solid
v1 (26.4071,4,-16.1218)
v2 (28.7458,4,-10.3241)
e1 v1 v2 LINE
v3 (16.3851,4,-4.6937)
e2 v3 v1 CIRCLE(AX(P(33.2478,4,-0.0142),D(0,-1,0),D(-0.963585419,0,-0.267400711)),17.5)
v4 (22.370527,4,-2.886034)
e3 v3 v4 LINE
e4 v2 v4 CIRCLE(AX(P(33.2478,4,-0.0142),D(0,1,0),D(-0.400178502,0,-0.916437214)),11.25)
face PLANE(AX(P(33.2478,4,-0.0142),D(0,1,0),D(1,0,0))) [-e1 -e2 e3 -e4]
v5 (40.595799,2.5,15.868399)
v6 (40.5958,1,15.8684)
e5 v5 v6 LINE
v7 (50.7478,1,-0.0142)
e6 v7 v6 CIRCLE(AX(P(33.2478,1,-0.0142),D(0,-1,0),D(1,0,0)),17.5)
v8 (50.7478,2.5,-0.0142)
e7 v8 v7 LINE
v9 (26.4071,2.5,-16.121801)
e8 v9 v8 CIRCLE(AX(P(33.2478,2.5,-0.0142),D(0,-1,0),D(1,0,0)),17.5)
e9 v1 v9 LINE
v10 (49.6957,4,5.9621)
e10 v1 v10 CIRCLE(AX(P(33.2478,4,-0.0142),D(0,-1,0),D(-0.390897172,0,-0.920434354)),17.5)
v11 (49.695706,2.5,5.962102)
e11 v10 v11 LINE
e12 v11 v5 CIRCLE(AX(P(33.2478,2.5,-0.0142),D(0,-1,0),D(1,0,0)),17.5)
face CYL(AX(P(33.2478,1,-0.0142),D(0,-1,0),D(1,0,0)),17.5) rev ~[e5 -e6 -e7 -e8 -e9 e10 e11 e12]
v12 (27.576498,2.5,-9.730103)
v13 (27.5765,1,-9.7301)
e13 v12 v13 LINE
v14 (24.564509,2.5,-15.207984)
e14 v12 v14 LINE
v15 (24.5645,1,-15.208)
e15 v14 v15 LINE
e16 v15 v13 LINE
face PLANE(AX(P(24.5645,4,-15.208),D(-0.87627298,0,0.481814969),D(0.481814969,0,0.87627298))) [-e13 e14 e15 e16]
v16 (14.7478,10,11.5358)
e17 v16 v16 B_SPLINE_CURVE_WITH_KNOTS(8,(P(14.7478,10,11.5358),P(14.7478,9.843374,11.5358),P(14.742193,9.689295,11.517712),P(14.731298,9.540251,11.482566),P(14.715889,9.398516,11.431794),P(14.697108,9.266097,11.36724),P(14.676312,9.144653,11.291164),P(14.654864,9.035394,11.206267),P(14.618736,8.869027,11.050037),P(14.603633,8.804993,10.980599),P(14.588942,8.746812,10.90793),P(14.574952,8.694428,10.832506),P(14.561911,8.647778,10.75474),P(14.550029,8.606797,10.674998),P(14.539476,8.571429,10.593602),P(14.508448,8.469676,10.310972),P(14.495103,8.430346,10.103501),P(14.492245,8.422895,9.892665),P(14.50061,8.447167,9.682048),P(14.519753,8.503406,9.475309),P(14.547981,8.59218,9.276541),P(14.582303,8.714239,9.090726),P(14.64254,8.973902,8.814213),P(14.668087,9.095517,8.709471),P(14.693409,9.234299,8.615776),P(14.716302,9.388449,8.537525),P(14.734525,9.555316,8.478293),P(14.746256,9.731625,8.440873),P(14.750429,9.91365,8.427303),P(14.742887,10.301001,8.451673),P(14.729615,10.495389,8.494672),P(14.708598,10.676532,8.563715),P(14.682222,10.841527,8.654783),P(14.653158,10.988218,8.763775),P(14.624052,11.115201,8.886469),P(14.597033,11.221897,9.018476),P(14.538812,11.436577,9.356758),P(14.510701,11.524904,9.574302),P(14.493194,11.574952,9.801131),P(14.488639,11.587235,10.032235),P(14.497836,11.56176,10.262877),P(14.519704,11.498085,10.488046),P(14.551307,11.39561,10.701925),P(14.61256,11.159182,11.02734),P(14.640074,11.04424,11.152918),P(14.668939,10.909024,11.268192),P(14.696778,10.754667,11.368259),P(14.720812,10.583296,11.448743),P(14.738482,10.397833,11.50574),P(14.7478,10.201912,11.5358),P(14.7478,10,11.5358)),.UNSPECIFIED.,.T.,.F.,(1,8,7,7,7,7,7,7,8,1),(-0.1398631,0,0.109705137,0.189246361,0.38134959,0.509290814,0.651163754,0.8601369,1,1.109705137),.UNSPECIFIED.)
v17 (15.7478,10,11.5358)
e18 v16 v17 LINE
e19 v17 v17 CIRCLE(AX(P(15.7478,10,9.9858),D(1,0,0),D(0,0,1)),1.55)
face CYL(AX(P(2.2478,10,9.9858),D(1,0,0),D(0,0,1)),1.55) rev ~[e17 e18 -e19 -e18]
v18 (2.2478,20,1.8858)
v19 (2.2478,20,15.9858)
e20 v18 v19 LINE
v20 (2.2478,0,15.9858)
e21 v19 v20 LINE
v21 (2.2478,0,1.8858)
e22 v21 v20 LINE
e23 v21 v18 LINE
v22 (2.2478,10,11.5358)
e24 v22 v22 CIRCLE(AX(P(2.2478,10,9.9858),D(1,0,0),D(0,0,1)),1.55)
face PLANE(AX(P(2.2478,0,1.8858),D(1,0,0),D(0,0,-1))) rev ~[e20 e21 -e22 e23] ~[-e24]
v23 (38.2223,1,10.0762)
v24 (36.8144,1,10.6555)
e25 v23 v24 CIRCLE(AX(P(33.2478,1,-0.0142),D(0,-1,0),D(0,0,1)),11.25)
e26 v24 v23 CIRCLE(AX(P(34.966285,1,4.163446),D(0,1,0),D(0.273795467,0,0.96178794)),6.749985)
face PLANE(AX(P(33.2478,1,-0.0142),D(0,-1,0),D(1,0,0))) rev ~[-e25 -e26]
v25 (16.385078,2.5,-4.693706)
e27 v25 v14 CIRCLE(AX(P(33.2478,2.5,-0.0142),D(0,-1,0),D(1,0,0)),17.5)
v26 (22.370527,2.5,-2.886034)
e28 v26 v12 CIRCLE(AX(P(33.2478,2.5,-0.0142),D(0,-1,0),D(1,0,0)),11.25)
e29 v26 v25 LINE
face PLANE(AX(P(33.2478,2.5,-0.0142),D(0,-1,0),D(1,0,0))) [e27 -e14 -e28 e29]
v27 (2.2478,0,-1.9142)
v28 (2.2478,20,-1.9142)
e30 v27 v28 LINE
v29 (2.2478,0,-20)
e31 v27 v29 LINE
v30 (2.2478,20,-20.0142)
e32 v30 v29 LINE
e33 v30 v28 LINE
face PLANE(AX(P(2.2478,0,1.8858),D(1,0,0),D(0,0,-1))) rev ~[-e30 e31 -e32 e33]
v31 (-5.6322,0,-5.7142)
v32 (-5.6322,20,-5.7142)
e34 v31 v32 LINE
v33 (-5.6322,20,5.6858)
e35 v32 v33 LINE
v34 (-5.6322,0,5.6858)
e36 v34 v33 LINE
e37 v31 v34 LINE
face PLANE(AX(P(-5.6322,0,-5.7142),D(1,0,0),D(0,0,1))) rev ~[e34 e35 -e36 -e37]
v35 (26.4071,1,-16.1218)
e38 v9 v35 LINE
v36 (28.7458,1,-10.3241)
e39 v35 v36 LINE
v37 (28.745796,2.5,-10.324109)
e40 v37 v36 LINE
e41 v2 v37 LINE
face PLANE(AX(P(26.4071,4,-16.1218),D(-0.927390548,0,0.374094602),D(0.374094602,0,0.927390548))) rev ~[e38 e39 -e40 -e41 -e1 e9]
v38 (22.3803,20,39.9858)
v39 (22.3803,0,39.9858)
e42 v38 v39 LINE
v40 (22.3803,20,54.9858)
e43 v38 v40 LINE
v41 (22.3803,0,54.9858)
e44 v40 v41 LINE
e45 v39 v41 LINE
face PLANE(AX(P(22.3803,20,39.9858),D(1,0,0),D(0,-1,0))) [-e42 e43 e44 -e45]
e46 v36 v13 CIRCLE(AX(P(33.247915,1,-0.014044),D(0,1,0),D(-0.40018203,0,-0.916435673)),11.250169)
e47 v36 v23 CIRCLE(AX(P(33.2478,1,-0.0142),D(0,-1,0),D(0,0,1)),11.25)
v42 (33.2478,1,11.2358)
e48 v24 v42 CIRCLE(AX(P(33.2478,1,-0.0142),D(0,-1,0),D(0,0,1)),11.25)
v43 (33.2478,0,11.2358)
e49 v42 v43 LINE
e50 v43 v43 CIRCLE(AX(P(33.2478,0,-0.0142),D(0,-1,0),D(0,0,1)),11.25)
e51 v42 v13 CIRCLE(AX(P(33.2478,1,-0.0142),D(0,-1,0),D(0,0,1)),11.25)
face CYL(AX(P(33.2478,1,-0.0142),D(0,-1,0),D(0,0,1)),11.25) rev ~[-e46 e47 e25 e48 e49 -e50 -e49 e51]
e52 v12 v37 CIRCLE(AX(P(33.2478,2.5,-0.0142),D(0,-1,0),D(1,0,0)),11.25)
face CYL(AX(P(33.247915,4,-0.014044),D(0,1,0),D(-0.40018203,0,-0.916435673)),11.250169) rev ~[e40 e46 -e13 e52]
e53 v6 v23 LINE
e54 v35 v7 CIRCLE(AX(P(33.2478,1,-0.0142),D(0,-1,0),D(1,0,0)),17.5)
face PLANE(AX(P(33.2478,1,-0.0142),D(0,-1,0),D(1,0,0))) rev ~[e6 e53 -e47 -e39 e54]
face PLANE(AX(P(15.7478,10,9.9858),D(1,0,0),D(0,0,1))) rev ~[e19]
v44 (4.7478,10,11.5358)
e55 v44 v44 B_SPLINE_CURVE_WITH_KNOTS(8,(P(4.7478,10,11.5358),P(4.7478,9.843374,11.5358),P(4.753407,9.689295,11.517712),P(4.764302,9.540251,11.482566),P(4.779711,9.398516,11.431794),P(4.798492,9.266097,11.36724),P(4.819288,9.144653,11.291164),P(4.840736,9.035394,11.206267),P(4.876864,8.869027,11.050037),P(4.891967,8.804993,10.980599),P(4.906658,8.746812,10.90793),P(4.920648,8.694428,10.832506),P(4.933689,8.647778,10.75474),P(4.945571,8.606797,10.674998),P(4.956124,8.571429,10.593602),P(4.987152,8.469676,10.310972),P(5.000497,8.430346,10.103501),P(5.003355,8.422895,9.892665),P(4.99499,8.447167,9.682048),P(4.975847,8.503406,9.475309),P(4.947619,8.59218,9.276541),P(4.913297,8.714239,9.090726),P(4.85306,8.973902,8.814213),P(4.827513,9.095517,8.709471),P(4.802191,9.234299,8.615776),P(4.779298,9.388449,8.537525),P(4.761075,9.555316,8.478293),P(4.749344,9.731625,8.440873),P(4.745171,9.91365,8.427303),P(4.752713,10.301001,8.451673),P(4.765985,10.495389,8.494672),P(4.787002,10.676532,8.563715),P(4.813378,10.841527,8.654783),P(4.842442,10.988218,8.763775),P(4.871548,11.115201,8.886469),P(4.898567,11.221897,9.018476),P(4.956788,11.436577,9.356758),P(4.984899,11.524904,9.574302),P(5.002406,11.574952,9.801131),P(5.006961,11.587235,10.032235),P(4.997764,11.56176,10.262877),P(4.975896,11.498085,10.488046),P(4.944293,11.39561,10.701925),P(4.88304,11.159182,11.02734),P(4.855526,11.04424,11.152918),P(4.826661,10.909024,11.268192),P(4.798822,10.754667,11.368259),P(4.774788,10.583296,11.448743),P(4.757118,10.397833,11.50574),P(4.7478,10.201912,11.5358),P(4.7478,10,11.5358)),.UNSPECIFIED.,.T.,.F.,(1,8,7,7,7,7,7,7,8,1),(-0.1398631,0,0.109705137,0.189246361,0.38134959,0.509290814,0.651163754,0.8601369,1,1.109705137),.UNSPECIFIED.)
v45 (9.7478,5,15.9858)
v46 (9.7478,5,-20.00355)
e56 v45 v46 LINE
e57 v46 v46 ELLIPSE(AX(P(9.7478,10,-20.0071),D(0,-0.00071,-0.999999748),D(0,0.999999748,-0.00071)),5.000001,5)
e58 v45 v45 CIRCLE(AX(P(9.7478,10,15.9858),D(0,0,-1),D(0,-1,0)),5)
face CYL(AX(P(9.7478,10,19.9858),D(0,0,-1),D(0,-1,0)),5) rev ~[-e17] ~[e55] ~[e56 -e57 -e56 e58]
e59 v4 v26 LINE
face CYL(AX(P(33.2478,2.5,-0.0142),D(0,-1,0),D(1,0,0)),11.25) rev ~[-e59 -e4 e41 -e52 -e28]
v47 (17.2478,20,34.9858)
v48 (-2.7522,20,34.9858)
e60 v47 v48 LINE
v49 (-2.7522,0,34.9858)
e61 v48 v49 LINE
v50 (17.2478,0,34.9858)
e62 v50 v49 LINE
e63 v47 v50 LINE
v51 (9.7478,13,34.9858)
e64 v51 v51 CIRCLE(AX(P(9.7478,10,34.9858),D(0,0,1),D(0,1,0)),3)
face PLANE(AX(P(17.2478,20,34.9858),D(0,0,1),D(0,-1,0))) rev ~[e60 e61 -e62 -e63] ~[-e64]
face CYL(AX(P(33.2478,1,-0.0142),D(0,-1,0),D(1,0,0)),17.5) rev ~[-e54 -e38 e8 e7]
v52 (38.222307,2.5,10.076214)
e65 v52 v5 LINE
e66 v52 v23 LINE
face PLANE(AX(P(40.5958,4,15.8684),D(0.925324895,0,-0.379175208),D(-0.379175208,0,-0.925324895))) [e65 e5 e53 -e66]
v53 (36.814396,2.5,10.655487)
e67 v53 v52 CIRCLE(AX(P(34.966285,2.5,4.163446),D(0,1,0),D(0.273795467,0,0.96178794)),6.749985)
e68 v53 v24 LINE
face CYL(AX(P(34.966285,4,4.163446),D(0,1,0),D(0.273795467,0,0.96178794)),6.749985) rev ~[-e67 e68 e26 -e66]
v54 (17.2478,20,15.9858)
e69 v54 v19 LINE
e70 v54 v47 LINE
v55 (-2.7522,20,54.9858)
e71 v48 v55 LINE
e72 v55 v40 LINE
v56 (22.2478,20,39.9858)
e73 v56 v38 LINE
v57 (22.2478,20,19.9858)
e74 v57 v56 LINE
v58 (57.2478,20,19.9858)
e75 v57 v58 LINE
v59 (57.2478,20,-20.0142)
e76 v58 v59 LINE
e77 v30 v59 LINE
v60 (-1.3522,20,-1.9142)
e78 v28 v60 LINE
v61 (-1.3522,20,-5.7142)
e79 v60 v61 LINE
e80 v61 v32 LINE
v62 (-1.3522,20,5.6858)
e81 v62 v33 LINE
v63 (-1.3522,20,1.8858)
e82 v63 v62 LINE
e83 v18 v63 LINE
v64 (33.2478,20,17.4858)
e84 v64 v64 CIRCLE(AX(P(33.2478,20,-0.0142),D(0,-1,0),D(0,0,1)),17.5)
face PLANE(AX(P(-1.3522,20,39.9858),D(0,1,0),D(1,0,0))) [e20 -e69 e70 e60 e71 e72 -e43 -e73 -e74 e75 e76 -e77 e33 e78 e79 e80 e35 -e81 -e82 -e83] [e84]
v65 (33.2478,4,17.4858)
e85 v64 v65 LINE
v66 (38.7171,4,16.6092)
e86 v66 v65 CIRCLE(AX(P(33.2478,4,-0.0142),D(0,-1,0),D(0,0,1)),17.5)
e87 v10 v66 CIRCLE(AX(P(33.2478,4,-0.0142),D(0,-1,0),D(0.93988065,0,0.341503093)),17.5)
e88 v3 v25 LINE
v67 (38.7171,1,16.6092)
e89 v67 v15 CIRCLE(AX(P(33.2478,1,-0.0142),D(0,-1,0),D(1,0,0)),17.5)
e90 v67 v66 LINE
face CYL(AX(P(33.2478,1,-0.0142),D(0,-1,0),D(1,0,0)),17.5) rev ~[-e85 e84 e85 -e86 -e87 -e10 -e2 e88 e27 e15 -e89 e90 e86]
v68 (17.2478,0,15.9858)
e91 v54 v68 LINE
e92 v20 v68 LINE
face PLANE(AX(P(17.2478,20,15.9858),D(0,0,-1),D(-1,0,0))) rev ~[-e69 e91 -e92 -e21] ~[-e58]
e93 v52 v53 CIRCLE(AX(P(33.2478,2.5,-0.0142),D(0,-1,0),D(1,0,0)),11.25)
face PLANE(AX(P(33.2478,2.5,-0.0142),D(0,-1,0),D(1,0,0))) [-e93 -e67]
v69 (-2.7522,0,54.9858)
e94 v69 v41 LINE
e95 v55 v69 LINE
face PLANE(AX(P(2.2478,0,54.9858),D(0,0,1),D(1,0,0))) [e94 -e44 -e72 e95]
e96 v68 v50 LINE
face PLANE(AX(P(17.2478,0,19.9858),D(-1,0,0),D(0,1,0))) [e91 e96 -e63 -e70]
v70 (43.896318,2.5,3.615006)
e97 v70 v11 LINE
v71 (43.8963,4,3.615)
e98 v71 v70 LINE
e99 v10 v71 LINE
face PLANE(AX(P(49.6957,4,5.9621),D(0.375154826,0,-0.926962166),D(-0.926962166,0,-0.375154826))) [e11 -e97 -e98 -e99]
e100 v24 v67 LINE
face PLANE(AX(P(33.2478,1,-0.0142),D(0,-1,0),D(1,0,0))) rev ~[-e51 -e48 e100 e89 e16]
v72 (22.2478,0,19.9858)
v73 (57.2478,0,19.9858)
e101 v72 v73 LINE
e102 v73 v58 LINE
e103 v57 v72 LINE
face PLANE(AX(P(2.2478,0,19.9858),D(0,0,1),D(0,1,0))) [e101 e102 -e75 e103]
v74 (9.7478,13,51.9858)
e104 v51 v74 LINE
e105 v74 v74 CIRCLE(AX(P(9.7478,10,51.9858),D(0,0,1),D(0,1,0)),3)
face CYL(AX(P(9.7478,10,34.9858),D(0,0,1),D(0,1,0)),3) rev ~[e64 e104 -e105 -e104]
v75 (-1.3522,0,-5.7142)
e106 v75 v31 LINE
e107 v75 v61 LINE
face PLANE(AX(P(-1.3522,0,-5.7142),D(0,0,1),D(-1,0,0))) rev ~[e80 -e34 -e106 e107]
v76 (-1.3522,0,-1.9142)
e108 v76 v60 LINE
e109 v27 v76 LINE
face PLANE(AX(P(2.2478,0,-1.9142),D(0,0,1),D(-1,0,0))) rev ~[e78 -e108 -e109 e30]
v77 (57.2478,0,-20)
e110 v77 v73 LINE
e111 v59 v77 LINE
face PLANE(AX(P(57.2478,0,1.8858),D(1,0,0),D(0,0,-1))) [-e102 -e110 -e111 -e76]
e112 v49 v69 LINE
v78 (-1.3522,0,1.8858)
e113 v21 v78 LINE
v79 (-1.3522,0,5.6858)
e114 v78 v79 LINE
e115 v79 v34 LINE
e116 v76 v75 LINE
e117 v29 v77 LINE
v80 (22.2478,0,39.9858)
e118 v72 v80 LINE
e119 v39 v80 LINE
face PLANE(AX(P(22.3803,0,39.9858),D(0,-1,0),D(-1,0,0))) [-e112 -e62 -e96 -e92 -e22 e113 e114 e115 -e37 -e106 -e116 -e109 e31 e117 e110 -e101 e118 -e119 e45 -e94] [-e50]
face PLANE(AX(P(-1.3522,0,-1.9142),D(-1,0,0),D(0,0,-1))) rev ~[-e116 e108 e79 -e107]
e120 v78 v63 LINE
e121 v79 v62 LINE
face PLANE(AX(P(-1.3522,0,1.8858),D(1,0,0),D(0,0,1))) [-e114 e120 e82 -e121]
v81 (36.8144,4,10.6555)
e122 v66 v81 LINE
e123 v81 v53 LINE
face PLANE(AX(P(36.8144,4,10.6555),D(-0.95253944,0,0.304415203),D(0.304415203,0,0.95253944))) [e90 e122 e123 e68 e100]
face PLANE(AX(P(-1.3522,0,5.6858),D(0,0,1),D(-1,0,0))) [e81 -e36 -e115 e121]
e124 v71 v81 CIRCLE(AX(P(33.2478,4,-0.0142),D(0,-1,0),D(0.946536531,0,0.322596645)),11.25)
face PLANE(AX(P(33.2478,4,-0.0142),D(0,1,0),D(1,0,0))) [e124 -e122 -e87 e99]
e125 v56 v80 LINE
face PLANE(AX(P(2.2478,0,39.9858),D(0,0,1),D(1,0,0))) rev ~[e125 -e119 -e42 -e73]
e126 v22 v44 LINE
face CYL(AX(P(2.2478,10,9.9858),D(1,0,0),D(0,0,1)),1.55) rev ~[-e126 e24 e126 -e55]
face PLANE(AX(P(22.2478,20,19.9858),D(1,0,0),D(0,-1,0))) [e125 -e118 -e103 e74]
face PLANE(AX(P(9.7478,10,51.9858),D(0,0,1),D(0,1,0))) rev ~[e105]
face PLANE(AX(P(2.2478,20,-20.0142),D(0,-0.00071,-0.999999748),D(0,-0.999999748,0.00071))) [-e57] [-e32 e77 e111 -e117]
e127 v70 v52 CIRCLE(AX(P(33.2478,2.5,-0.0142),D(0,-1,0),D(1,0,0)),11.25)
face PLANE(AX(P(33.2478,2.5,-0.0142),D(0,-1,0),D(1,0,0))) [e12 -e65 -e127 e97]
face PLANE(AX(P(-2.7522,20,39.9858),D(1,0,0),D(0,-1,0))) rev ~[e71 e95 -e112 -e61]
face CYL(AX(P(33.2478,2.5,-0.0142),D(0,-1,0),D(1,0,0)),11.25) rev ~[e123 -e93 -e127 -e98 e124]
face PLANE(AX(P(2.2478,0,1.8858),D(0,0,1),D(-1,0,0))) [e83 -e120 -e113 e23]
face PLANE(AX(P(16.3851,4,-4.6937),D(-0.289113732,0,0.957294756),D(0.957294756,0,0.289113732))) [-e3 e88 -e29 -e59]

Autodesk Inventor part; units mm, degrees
ref_plane "YZ Plane" through (0, 0, 0) normal (1, 0, 0) x (0, 1, 0)
ref_plane "XZ Plane" through (0, 0, 0) normal (0, 1, 0) x (-1, 0, 0)
ref_plane "XY Plane" through (0, 0, 0) normal (0, 0, 1) x (1, 0, 0)
sketch "Sketch1" plane through (0, 0, 0) normal (0, 1, 0) x (-1, 0, 0)
  line L0 (-2.2478, 1.8858) -> (1.3522, 1.8858)
  line L1 (-2.2478, 1.8858) -> (-2.2478, -1.9142)
  line L2 (-2.2478, -1.9142) -> (1.3522, -1.9142)
  line L3 (1.3522, 1.8858) -> (1.3522, 5.6858)
  line L4 (1.3522, -1.9142) -> (1.3522, -5.7142)
  line L5 (1.3522, -5.7142) -> (5.6322, -5.7142)
  line L6 (5.6322, -5.7142) -> (5.6322, 5.6858)
  line L7 (1.3522, 5.6858) -> (5.6322, 5.6858)
  point P0 (0, 0)
  dimension "d1" = 3.6
  dimension "d2" = 3.8
  dimension "d3" = 3.8
  dimension "d4" = 3.8
  dimension "d6" = 4.28
  dimension "d7" = 11.4
  dimension "d98" = 3.6
extrude "Extrusion1" add sketch "Sketch1" along normal blind 20
sketch "Sketch2" plane through (2.2478, 0, 1.8858) normal (1, 0, 0) x (0, 0, -1)
  line L0 (3.8, 0) -> (7.6, 0) projected
  line L1 (0, 20) -> (3.8, 20) projected
  line L2 (1.9, 20) -> (-18.1, 20)
  line L3 (21.9, 20) -> (1.9, 20)
  line L4 (1.8858, 0) -> (21.8858, 0)
  line L5 (0, 0) -> (3.8, 0) projected
  line L6 (1.8858, 0) -> (-18.1, 0)
  line L7 (-18.1, 0) -> (-18.1, 20)
  line L8 (21.9, 20) -> (21.8858, 0)
  point P0 (12, 0)
  point P1 (3.8, 0)
  dimension "d17" = 20
  dimension "d26" = 20
  dimension "d27" = 20
extrude "Extrusion2" add sketch "Sketch2" along normal blind 55
sketch "Sketch4" plane through (0, 20, 0) normal (0, 1, 0) x (1, 0, 0)
  line L0 (2.2478, 1.9142) -> (-1.3522, 1.9142) projected
  line L1 (2.2478, -1.8858) -> (2.2478, 1.9142)
  line L2 (2.2478, 0.0142) -> (33.2478, 0.0142)
  point P0 (0, 0)
  dimension "d16" = 31
sketch "Sketch5" plane through (0, 20, 0) normal (0, 1, 0) x (1, 0, 0)
  point P0 (0, 0)
hole "Hole2" at (33.2478, 20, -0.0142) direction (0, -1, 0) diameter 22.5 depth 22.5 counterbore diameter 35 counterbore depth 19
sketch "Sketch6" plane through (0, 0, 0) normal (0, -1, 0) x (1, 0, 0)
  point P0 (0, 0)
sketch "Sketch7" plane through (2.2478, 0, 19.9858) normal (0, 0, 1) x (1, 0, 0)
  line L0 (0, 0) -> (55, 0) projected
  line L1 (0, 0) -> (55, 0) projected
  line L2 (15, 0) -> (15, 20)
  line L3 (15, 20) -> (20, 20)
  line L4 (0, 20) -> (55, 20) projected
  line L5 (20, 20) -> (20, 0)
  line L6 (42.25, 0) -> (19.75, 0) projected
  line L7 (15, 0) -> (20, 0)
  point P0 (-2.2478, 0)
  dimension "d41" = 5
extrude "Extrusion4" add sketch "Sketch7" along normal blind 20
sketch "Sketch10" plane through (17.2478, 0, 19.9858) normal (-1, 0, 0) x (0, 0, 1)
  line L0 (0, 20) -> (20, 20) projected
  line L1 (0, 0) -> (20, 0) projected
  line L2 (20, 20) -> (15, 20)
  line L3 (15, 20) -> (15, 0)
  line L4 (15, 0) -> (20, 0)
  line L5 (20, 0) -> (20, 20)
  point P0 (-19.9858, 0)
  point P1 (20, 0)
  dimension "d42" = 5
extrude "Extrusion6" add sketch "Sketch10" along normal blind 20
sketch "Sketch11" plane through (2.2478, 0, 19.9858) normal (0, 0, 1) x (1, 0, 0)
  point P0 (-2.2478, 0)
sketch "Sketch12" plane through (2.2478, 0, 19.9858) normal (0, 0, 1) x (1, 0, 0)
  point P0 (-2.2478, 0)
sketch "Sketch13" plane through (2.2478, 0, 19.9858) normal (0, 0, 1) x (1, 0, 0)
  point P0 (-2.2478, 0)
sketch "Sketch14" plane through (2.2478, 0, 19.9858) normal (0, 0, 1) x (1, 0, 0)
  line L0 (0, 0) -> (15, 0) projected
  line L1 (7.5, 0) -> (7.5, 10)
  line L2 (0, 20) -> (15, 20) projected
  point P0 (-2.2478, 0)
  dimension "d45" = 10
hole "Hole3" at (9.7478, 10, 19.9858) direction (0, 0, -1) diameter 10 depth 49.5
sketch "Sketch15" plane through (2.2478, 0, 39.9858) normal (0, 0, 1) x (1, 0, 0)
  line L0 (-3.6, 20) -> (-7.88, 20) projected
  line L1 (42.25, 0) -> (19.75, 0) projected
  line L2 (-5.0624, 20) -> (20.1325, 20)
  line L3 (20.1325, 20) -> (20.1325, 0)
  line L4 (20.1325, 0) -> (-5.0624, 0)
  line L5 (20, 20) -> (-5, 20) projected
  line L6 (20, 0) -> (-5, 0) projected
  line L7 (-5, 20) -> (-5, 0)
  point P0 (-2.2478, 0)
  point P1 (19.75, 0)
extrude "Extrusion7" add sketch "Sketch15" along normal blind 15
sketch "Sketch18" plane through (0, 20, 0) normal (0, 1, 0) x (1, 0, 0)
  line L0 (2.2478, 1.9142) -> (2.2478, 20) projected
  line L1 (2.2478, 20) -> (2.2478, -54.9858)
  line L2 (22.3802, -54.9858) -> (-2.7522, -54.9858) projected
  point P0 (0, 0)
  dimension "d73" = 74.9858
sketch "Sketch19" plane through (2.2478, 0, 1.8858) normal (-1, 0, 0) x (0, 0, 1)
  circle A0 centre (10, 10) radius 1.55 projected
  line L0 (18.1, 20) -> (18.1, 0) projected
  line L1 (18.1, 10) -> (8.1, 10)
  point P0 (-1.8858, 0)
  dimension "d75" = 10
hole "Hole6" at (2.2478, 10, 9.9858) direction (1, 0, 0) diameter 3.1 depth 13.5
sketch "Sketch20" plane through (2.2478, 0, 1.8858) normal (-1, 0, 0) x (0, 0, 1)
  circle A0 centre (8.1, 10) radius 1.55 projected
  line L0 (8.1, 10) -> (33.1, 10)
  line L1 (33.1, 20) -> (33.1, 0) projected
  point P0 (-1.8858, 0)
  dimension "d83" = 25
sketch "Sketch21" plane through (17.2478, 0, 19.9858) normal (-1, 0, 0) x (0, 0, 1)
  point P0 (-19.9858, 0)
sketch "Sketch22" plane through (0, 20, 0) normal (0, 1, 0) x (1, 0, 0)
  line L0 (2.2478, -19.9858) -> (17.2478, -19.9858) projected
  line L1 (2.2478, -19.9858) -> (17.2478, -19.9858)
  line L2 (17.2478, -19.9858) -> (17.2478, -15.9858)
  line L3 (17.2478, -15.9858) -> (2.2478, -15.9858)
  line L4 (2.2478, -15.9858) -> (2.2478, -19.9858)
  point P0 (0, 0)
  dimension "d84" = 15
  dimension "d85" = 4
extrude "Extrusion8" cut sketch "Sketch22" against normal blind 22.25
sketch "Sketch23" plane through (17.2478, 0, 34.9858) normal (0, 0, -1) x (-1, 0, 0)
  circle A0 centre (10, 10) radius 2.5 projected
  circle A1 centre (7.5, 10) radius 3
  point P0 (17.2478, 0)
  dimension "d88" = 6
hole "Hole7" at (9.7478, 10, 34.9858) direction (0, 0, 1) diameter 6 depth 17
sketch "Sketch24" plane through (2.2478, 0, 1.8858) normal (-1, 0, 0) x (0, 0, 1)
  circle A0 centre (8.1, 10) radius 1.55 projected
  line L0 (9.65, 10) -> (14.1, 10)
  line L1 (14.1, 5) -> (14.1, 15) projected
  point P0 (-1.8858, 0)
  dimension "d96" = 4.45
sketch "Sketch25" plane through (-2.7522, 0, 19.9858) normal (-1, 0, 0) x (0, 0, 1)
  line L0 (15, 0) -> (15, 20) projected
  line L1 (15, 10) -> (35, 10)
  line L2 (35, 0) -> (35, 20) projected
  point P0 (-19.9858, 0)
  dimension "d97" = 20
ref_plane "Work Plane2" through (33.2478, 0.5, -0.0142) normal (0, 1, 0) x (1, 0, 0)
sketch "Sketch26" plane through (33.2478, 1, -0.0142) normal (0, 1, 0) x (1, 0, 0)
  circle A0 centre (0, 0) radius 17.5
  point P0 (-33.2478, -0.0142)
extrude "Extrusion9" add sketch "Sketch26" along normal blind 3
sketch "Sketch27" plane through (33.2478, 4, -0.0142) normal (0, 1, 0) x (1, 0, 0)
  circle A0 centre (0, 0) radius 17.5
  point P0 (-33.2478, -0.0142)
sketch "Sketch29" plane through (33.2478, 1, -0.0142) normal (0, -1, 0) x (1, 0, 0)
  circle A0 centre (0, 0) radius 17.5
  point P0 (-33.2478, 0.0142)
extrude "Extrusion10" cut sketch "Sketch29" against normal blind 1.5
sketch "Sketch30" plane through (33.2478, 2.5, -0.0142) normal (0, -1, 0) x (1, 0, 0)
  circle A0 centre (0, 0) radius 11.25
  point P0 (-33.2478, 0.0142)
extrude "Extrusion11" cut sketch "Sketch30" against normal blind 24
sketch "Sketch31" plane through (33.2478, 4, -0.0142) normal (0, 1, 0) x (1, 0, 0)
  circle A0 centre (0, 0) radius 17.5 projected
  arc A1 (16.4479, -5.9763) -> (-4.1987, 16.9888) centre (0, 0) ccw
  arc A2 (-16.8627, 4.6795) -> (5.4693, -16.6234) centre (0, 0) ccw
  line L0 (5.4693, -16.6234) -> (3.5666, -10.6697)
  circle A3 centre (0, 0) radius 11.25 projected
  line L1 (-16.8627, 4.6795) -> (-10.8414, 2.861)
  line L2 (16.4479, -5.9763) -> (10.6485, -3.6292)
  line L3 (-6.8407, 16.1076) -> (-4.502, 10.3099)
  point P0 (-33.2478, -0.0142)
  point P1 (-10.8773, 2.8718)
  point P2 (5.4693, -16.6234)
extrude "Extrusion12" cut sketch "Sketch31" against normal blind 2.25 contours A0 L2 A3 L3 | A0 L1 A3 L0
sketch "Sketch32" plane through (33.2478, 4, -0.0142) normal (0, 1, 0) x (1, 0, 0)
  arc A0 (5.4693, -16.6234) -> (16.4479, -5.9763) centre (0, 0) ccw projected
  arc A1 (5.4693, -16.6234) -> (7.348, -15.8826) centre (0, 0) ccw
  line L0 (3.5666, -10.6697) -> (5.4693, -16.6234) projected
  line L1 (5.4693, -16.6234) -> (3.5666, -10.6697)
  line L2 (7.348, -15.8826) -> (4.9745, -10.0904)
  arc A2 (3.5666, -10.6697) -> (10.6485, -3.6292) centre (0, 0) ccw projected
  arc A3 (3.5666, -10.6697) -> (4.9745, -10.0904) centre (1.7167, -4.1725) ccw
  arc A4 (-6.8407, 16.1076) -> (-16.8627, 4.6795) centre (0, 0) ccw projected
  arc A5 (-6.8407, 16.1076) -> (-8.6833, 15.1938) centre (0, 0) ccw
  line L3 (-6.8407, 16.1076) -> (-4.502, 10.3099) projected
  line L4 (-6.8407, 16.1076) -> (-4.502, 10.3099)
  line L5 (-8.6833, 15.1938) -> (-5.6713, 9.7159)
  arc A6 (-4.502, 10.3099) -> (-10.8773, 2.8718) centre (0, 0) ccw projected
  arc A7 (-4.502, 10.3099) -> (-5.6713, 9.7159) centre (0, 0) ccw
  point P0 (-33.2478, -0.0142)
extrude "Extrusion13" add sketch "Sketch32" against normal blind 3 contours L0 A3 L2 A0 | L3 A6 L5 A4
properties part number "spoutextrusion"
